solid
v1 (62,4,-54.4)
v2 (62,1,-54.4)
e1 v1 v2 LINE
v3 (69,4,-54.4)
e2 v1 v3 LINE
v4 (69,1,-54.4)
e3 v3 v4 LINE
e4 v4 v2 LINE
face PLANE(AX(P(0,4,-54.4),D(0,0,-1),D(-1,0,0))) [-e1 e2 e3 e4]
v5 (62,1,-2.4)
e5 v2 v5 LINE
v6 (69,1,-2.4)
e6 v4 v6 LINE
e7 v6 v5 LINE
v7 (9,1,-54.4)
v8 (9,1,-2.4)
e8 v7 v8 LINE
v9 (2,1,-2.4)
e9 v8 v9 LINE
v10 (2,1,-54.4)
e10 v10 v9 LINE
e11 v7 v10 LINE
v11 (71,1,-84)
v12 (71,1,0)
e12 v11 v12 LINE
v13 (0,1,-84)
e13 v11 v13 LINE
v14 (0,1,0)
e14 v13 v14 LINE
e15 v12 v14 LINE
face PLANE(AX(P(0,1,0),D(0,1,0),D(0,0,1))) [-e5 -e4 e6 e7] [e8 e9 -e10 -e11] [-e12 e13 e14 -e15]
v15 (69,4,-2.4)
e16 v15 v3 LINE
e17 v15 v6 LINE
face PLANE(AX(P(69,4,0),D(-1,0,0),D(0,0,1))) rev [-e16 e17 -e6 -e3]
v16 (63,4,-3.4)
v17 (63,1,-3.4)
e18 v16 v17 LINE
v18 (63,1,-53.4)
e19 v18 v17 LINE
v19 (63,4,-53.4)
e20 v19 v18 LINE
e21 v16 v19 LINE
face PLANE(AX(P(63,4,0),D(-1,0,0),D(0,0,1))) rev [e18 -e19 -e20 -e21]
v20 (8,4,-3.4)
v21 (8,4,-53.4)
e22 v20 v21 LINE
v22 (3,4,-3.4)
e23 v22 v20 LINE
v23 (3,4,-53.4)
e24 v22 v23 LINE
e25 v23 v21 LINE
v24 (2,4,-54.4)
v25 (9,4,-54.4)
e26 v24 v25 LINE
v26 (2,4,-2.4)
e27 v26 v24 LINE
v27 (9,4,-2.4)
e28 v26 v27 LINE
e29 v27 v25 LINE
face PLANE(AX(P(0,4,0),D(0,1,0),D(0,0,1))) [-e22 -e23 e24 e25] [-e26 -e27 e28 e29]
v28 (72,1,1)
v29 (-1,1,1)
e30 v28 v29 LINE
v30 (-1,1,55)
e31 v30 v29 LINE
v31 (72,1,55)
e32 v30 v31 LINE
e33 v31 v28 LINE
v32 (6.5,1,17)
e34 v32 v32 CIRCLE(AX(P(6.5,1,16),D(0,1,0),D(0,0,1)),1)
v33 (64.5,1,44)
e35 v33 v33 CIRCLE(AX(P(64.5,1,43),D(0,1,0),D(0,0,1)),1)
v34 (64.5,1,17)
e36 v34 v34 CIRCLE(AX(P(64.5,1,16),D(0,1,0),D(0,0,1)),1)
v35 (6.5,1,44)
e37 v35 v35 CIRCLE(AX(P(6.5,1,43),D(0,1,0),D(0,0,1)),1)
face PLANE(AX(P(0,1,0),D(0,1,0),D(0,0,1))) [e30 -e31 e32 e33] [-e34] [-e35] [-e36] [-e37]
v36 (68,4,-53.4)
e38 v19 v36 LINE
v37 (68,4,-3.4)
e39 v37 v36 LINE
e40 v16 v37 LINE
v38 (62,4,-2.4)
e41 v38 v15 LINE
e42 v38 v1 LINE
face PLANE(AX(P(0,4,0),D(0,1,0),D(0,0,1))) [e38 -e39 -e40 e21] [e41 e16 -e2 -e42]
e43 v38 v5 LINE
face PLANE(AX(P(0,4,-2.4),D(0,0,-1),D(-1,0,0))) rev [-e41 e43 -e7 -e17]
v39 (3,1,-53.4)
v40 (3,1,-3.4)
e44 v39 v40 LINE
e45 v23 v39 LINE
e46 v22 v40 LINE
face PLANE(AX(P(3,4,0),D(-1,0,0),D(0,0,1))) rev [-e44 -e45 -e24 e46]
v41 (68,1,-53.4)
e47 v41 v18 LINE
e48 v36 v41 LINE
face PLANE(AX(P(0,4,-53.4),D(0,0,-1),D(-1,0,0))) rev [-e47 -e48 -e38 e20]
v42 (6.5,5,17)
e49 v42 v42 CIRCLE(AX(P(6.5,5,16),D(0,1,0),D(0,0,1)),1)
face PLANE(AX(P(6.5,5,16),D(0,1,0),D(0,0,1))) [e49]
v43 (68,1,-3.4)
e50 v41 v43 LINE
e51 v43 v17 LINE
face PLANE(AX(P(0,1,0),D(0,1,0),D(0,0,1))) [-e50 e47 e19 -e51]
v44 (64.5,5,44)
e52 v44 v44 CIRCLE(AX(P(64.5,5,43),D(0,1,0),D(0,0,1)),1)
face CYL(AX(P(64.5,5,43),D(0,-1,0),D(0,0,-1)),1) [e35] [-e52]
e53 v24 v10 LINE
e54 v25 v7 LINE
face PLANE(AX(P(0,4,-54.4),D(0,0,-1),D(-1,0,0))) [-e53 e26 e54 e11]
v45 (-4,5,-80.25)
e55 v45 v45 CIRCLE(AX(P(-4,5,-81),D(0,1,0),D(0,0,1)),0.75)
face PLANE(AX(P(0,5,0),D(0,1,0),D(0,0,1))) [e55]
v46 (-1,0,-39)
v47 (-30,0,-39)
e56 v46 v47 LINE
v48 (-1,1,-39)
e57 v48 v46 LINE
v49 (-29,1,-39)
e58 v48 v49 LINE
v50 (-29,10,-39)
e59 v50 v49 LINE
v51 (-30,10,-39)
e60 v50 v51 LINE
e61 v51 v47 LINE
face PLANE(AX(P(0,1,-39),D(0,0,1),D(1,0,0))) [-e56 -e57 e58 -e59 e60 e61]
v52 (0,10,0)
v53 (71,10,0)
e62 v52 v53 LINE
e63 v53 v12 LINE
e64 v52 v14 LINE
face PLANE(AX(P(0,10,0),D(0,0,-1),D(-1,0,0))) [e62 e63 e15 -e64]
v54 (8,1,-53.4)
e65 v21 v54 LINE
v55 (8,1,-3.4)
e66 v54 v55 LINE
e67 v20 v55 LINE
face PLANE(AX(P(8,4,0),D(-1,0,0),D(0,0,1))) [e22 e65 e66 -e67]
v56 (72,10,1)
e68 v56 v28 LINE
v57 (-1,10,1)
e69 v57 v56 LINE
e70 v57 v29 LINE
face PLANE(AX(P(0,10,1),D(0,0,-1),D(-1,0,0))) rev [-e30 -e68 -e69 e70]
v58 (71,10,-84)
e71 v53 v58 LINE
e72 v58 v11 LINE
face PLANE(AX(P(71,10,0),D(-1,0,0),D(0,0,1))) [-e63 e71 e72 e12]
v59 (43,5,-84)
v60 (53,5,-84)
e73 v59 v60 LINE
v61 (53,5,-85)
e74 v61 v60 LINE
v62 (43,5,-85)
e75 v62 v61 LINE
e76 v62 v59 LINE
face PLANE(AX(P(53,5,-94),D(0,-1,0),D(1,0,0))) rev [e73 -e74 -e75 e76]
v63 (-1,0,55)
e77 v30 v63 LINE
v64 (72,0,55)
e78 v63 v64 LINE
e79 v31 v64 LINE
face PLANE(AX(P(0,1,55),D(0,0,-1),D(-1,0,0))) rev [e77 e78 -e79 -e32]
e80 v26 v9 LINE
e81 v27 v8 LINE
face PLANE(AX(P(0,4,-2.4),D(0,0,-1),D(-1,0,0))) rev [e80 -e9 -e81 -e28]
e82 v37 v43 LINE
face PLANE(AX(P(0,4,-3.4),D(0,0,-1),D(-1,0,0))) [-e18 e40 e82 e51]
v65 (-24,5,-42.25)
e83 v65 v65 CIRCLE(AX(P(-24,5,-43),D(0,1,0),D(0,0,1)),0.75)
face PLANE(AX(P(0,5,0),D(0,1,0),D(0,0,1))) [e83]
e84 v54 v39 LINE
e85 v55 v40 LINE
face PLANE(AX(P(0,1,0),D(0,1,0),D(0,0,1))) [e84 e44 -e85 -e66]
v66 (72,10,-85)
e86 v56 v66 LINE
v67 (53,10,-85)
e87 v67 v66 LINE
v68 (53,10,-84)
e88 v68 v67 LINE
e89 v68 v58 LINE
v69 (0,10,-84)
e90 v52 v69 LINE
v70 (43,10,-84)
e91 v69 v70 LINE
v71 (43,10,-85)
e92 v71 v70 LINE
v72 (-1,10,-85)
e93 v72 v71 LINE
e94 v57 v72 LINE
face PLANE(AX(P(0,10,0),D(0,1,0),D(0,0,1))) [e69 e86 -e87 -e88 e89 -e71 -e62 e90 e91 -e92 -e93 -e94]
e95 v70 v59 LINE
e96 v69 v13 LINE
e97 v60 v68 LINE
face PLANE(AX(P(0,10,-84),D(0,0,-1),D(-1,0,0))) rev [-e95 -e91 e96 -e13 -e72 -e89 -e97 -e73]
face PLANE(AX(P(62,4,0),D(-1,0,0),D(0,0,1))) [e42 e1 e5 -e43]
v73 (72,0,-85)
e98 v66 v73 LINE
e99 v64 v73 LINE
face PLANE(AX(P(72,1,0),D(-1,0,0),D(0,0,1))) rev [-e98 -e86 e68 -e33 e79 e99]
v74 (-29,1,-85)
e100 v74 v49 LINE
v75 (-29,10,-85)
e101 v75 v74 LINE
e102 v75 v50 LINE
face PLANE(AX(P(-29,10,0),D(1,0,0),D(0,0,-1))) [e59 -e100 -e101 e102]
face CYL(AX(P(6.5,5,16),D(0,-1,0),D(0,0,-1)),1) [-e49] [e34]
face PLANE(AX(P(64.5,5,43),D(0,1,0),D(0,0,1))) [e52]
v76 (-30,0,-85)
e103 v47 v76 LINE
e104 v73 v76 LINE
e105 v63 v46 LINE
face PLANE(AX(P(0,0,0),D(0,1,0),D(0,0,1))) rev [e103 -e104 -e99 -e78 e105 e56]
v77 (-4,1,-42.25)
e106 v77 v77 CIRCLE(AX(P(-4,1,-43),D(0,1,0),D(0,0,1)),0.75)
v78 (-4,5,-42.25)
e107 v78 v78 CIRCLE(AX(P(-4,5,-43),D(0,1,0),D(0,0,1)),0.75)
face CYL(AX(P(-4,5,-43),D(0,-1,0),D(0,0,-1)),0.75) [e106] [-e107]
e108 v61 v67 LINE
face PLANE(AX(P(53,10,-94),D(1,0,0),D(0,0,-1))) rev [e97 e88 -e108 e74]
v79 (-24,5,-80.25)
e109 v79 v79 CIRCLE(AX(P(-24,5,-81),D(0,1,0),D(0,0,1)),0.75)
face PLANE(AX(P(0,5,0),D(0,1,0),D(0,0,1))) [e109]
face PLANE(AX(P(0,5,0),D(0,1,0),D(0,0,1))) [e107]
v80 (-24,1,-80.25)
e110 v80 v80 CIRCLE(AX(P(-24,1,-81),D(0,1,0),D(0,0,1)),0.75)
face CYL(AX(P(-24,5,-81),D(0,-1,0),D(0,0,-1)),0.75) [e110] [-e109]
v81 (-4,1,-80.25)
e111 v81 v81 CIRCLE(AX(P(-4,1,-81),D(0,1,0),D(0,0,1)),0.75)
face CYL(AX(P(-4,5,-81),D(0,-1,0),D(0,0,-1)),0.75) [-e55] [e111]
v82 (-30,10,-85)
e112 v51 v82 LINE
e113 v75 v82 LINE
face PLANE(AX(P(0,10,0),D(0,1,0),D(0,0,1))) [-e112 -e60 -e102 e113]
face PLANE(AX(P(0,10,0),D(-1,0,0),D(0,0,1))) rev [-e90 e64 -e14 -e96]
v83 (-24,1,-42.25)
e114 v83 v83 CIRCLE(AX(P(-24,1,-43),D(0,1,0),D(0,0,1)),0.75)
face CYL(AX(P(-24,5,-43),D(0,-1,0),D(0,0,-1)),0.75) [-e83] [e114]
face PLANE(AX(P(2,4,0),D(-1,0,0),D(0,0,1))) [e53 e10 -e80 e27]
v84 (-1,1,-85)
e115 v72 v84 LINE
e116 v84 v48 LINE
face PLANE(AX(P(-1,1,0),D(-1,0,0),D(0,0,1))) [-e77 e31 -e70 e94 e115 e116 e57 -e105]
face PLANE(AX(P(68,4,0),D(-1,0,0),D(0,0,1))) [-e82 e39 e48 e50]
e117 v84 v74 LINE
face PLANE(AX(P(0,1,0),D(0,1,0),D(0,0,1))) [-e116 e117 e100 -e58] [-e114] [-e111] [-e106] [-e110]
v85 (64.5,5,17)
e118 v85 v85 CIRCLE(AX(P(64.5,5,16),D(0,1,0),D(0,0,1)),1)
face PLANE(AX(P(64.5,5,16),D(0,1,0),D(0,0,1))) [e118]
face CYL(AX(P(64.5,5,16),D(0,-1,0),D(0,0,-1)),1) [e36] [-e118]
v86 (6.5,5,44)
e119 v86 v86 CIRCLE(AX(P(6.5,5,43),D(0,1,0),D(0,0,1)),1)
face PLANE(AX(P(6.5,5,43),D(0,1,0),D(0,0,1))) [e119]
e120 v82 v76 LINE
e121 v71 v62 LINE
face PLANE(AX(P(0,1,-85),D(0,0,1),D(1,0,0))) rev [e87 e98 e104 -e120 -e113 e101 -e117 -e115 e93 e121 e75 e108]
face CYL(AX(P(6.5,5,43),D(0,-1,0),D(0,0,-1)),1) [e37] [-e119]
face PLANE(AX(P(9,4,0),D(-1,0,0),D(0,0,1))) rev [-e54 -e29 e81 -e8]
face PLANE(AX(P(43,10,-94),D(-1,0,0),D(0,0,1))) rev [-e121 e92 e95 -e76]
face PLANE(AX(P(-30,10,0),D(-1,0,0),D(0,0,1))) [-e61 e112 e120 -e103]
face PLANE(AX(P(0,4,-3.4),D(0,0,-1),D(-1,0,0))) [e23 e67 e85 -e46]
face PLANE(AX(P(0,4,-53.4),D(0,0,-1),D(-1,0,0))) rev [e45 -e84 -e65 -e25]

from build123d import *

# Parameters (mm, degrees)
SKETCH_1_R          = 1
SKETCH_1_R_2        = 0.75
EXTRUDE_1_DEPTH     = 1
SKETCH_1_3_W        = 73
SKETCH_1_3_H        = 86
SKETCH_1_3_W_2      = 71
SKETCH_1_3_H_2      = 84
SKETCH_1_3_W_3      = 1
SKETCH_1_3_H_3      = 46
EXTRUDE_2_DEPTH     = 10
SKETCH_1_4_W        = 7
SKETCH_1_4_H        = 52
SKETCH_1_4_W_2      = 5
SKETCH_1_4_H_2      = 50
EXTRUDE_3_DEPTH     = 4
SKETCH_1_5_R        = 1
SKETCH_1_5_R_2      = 0.75
EXTRUDE_4_DEPTH     = 5
SKETCH_2_W          = 10
SKETCH_2_H          = 5
CUT_EXTRUDE_2_DEPTH = 10


with BuildPart() as part:
    # Эскиз1 → Бобышка-Вытянуть1 (new body)
    with BuildSketch(Plane(origin=(0, 0, 0), x_dir=(1, 0, 0), z_dir=(0, 1, 0))):
        Polygon((-29, 85), (-29, 39), (-1, 39), (-1, -55), (72, -55), (72, 85), align=None)
        with Locations((64.5, -16)):
            Circle(SKETCH_1_R, mode=Mode.SUBTRACT)
        with Locations((64.5, -43)):
            Circle(SKETCH_1_R, mode=Mode.SUBTRACT)
        with Locations((6.5, -43)):
            Circle(SKETCH_1_R, mode=Mode.SUBTRACT)
        with Locations((6.5, -16)):
            Circle(SKETCH_1_R, mode=Mode.SUBTRACT)
        with Locations((-4, 81)):
            Circle(SKETCH_1_R_2, mode=Mode.SUBTRACT)
        with Locations((-24, 43)):
            Circle(SKETCH_1_R_2, mode=Mode.SUBTRACT)
        with Locations((-4, 43)):
            Circle(SKETCH_1_R_2, mode=Mode.SUBTRACT)
        with Locations((-24, 81)):
            Circle(SKETCH_1_R_2, mode=Mode.SUBTRACT)
    extrude(amount=EXTRUDE_1_DEPTH)

    # Эскиз1<3> → Бобышка-Вытянуть2 (add)
    # profile 1 of 2: a face of its own
    with BuildSketch(Plane(origin=(0, 0, 0), x_dir=(1, 0, 0), z_dir=(0, 1, 0))):
        with Locations((35.5, 42)):
            Rectangle(SKETCH_1_3_W, SKETCH_1_3_H)
        with Locations((35.5, 42)):
            Rectangle(SKETCH_1_3_W_2, SKETCH_1_3_H_2, mode=Mode.SUBTRACT)
    # profile 2 of 2: a face of its own
    with BuildSketch(Plane(origin=(0, 0, 0), x_dir=(1, 0, 0), z_dir=(0, 1, 0))):
        with Locations((-29.5, 62)):
            Rectangle(SKETCH_1_3_W_3, SKETCH_1_3_H_3)
    extrude(amount=EXTRUDE_2_DEPTH)

    # Эскиз1<4> → Бобышка-Вытянуть3 (add)
    # profile 1 of 2: a face of its own
    with BuildSketch(Plane(origin=(0, 0, 0), x_dir=(1, 0, 0), z_dir=(0, 1, 0))):
        with Locations((5.5, 28.4)):
            Rectangle(SKETCH_1_4_W, SKETCH_1_4_H)
        with Locations((5.5, 28.4)):
            Rectangle(SKETCH_1_4_W_2, SKETCH_1_4_H_2, mode=Mode.SUBTRACT)
    # profile 2 of 2: a face of its own
    with BuildSketch(Plane(origin=(0, 0, 0), x_dir=(1, 0, 0), z_dir=(0, 1, 0))):
        with Locations((65.5, 28.4)):
            Rectangle(SKETCH_1_4_W, SKETCH_1_4_H)
        with Locations((65.5, 28.4)):
            Rectangle(SKETCH_1_4_W_2, SKETCH_1_4_H_2, mode=Mode.SUBTRACT)
    extrude(amount=EXTRUDE_3_DEPTH)

    # Эскиз1<5> → Бобышка-Вытянуть4 (add)
    with BuildSketch(Plane(origin=(0, 0, 0), x_dir=(1, 0, 0), z_dir=(0, 1, 0))):
        with Locations((6.5, -16)):
            Circle(SKETCH_1_5_R)
        with Locations((64.5, -16)):
            Circle(SKETCH_1_5_R)
        with Locations((64.5, -43)):
            Circle(SKETCH_1_5_R)
        with Locations((6.5, -43)):
            Circle(SKETCH_1_5_R)
        with Locations((-24, 81)):
            Circle(SKETCH_1_5_R_2)
        with Locations((-4, 81)):
            Circle(SKETCH_1_5_R_2)
        with Locations((-24, 43)):
            Circle(SKETCH_1_5_R_2)
        with Locations((-4, 43)):
            Circle(SKETCH_1_5_R_2)
    extrude(amount=EXTRUDE_4_DEPTH)

    # Эскиз2 → Вырез-Вытянуть2 (cut)
    with BuildSketch(Plane.XY.offset(-84)):
        with Locations((48, 7.5)):
            Rectangle(SKETCH_2_W, SKETCH_2_H)
    extrude(amount=-CUT_EXTRUDE_2_DEPTH, mode=Mode.SUBTRACT)


solid = part.part
